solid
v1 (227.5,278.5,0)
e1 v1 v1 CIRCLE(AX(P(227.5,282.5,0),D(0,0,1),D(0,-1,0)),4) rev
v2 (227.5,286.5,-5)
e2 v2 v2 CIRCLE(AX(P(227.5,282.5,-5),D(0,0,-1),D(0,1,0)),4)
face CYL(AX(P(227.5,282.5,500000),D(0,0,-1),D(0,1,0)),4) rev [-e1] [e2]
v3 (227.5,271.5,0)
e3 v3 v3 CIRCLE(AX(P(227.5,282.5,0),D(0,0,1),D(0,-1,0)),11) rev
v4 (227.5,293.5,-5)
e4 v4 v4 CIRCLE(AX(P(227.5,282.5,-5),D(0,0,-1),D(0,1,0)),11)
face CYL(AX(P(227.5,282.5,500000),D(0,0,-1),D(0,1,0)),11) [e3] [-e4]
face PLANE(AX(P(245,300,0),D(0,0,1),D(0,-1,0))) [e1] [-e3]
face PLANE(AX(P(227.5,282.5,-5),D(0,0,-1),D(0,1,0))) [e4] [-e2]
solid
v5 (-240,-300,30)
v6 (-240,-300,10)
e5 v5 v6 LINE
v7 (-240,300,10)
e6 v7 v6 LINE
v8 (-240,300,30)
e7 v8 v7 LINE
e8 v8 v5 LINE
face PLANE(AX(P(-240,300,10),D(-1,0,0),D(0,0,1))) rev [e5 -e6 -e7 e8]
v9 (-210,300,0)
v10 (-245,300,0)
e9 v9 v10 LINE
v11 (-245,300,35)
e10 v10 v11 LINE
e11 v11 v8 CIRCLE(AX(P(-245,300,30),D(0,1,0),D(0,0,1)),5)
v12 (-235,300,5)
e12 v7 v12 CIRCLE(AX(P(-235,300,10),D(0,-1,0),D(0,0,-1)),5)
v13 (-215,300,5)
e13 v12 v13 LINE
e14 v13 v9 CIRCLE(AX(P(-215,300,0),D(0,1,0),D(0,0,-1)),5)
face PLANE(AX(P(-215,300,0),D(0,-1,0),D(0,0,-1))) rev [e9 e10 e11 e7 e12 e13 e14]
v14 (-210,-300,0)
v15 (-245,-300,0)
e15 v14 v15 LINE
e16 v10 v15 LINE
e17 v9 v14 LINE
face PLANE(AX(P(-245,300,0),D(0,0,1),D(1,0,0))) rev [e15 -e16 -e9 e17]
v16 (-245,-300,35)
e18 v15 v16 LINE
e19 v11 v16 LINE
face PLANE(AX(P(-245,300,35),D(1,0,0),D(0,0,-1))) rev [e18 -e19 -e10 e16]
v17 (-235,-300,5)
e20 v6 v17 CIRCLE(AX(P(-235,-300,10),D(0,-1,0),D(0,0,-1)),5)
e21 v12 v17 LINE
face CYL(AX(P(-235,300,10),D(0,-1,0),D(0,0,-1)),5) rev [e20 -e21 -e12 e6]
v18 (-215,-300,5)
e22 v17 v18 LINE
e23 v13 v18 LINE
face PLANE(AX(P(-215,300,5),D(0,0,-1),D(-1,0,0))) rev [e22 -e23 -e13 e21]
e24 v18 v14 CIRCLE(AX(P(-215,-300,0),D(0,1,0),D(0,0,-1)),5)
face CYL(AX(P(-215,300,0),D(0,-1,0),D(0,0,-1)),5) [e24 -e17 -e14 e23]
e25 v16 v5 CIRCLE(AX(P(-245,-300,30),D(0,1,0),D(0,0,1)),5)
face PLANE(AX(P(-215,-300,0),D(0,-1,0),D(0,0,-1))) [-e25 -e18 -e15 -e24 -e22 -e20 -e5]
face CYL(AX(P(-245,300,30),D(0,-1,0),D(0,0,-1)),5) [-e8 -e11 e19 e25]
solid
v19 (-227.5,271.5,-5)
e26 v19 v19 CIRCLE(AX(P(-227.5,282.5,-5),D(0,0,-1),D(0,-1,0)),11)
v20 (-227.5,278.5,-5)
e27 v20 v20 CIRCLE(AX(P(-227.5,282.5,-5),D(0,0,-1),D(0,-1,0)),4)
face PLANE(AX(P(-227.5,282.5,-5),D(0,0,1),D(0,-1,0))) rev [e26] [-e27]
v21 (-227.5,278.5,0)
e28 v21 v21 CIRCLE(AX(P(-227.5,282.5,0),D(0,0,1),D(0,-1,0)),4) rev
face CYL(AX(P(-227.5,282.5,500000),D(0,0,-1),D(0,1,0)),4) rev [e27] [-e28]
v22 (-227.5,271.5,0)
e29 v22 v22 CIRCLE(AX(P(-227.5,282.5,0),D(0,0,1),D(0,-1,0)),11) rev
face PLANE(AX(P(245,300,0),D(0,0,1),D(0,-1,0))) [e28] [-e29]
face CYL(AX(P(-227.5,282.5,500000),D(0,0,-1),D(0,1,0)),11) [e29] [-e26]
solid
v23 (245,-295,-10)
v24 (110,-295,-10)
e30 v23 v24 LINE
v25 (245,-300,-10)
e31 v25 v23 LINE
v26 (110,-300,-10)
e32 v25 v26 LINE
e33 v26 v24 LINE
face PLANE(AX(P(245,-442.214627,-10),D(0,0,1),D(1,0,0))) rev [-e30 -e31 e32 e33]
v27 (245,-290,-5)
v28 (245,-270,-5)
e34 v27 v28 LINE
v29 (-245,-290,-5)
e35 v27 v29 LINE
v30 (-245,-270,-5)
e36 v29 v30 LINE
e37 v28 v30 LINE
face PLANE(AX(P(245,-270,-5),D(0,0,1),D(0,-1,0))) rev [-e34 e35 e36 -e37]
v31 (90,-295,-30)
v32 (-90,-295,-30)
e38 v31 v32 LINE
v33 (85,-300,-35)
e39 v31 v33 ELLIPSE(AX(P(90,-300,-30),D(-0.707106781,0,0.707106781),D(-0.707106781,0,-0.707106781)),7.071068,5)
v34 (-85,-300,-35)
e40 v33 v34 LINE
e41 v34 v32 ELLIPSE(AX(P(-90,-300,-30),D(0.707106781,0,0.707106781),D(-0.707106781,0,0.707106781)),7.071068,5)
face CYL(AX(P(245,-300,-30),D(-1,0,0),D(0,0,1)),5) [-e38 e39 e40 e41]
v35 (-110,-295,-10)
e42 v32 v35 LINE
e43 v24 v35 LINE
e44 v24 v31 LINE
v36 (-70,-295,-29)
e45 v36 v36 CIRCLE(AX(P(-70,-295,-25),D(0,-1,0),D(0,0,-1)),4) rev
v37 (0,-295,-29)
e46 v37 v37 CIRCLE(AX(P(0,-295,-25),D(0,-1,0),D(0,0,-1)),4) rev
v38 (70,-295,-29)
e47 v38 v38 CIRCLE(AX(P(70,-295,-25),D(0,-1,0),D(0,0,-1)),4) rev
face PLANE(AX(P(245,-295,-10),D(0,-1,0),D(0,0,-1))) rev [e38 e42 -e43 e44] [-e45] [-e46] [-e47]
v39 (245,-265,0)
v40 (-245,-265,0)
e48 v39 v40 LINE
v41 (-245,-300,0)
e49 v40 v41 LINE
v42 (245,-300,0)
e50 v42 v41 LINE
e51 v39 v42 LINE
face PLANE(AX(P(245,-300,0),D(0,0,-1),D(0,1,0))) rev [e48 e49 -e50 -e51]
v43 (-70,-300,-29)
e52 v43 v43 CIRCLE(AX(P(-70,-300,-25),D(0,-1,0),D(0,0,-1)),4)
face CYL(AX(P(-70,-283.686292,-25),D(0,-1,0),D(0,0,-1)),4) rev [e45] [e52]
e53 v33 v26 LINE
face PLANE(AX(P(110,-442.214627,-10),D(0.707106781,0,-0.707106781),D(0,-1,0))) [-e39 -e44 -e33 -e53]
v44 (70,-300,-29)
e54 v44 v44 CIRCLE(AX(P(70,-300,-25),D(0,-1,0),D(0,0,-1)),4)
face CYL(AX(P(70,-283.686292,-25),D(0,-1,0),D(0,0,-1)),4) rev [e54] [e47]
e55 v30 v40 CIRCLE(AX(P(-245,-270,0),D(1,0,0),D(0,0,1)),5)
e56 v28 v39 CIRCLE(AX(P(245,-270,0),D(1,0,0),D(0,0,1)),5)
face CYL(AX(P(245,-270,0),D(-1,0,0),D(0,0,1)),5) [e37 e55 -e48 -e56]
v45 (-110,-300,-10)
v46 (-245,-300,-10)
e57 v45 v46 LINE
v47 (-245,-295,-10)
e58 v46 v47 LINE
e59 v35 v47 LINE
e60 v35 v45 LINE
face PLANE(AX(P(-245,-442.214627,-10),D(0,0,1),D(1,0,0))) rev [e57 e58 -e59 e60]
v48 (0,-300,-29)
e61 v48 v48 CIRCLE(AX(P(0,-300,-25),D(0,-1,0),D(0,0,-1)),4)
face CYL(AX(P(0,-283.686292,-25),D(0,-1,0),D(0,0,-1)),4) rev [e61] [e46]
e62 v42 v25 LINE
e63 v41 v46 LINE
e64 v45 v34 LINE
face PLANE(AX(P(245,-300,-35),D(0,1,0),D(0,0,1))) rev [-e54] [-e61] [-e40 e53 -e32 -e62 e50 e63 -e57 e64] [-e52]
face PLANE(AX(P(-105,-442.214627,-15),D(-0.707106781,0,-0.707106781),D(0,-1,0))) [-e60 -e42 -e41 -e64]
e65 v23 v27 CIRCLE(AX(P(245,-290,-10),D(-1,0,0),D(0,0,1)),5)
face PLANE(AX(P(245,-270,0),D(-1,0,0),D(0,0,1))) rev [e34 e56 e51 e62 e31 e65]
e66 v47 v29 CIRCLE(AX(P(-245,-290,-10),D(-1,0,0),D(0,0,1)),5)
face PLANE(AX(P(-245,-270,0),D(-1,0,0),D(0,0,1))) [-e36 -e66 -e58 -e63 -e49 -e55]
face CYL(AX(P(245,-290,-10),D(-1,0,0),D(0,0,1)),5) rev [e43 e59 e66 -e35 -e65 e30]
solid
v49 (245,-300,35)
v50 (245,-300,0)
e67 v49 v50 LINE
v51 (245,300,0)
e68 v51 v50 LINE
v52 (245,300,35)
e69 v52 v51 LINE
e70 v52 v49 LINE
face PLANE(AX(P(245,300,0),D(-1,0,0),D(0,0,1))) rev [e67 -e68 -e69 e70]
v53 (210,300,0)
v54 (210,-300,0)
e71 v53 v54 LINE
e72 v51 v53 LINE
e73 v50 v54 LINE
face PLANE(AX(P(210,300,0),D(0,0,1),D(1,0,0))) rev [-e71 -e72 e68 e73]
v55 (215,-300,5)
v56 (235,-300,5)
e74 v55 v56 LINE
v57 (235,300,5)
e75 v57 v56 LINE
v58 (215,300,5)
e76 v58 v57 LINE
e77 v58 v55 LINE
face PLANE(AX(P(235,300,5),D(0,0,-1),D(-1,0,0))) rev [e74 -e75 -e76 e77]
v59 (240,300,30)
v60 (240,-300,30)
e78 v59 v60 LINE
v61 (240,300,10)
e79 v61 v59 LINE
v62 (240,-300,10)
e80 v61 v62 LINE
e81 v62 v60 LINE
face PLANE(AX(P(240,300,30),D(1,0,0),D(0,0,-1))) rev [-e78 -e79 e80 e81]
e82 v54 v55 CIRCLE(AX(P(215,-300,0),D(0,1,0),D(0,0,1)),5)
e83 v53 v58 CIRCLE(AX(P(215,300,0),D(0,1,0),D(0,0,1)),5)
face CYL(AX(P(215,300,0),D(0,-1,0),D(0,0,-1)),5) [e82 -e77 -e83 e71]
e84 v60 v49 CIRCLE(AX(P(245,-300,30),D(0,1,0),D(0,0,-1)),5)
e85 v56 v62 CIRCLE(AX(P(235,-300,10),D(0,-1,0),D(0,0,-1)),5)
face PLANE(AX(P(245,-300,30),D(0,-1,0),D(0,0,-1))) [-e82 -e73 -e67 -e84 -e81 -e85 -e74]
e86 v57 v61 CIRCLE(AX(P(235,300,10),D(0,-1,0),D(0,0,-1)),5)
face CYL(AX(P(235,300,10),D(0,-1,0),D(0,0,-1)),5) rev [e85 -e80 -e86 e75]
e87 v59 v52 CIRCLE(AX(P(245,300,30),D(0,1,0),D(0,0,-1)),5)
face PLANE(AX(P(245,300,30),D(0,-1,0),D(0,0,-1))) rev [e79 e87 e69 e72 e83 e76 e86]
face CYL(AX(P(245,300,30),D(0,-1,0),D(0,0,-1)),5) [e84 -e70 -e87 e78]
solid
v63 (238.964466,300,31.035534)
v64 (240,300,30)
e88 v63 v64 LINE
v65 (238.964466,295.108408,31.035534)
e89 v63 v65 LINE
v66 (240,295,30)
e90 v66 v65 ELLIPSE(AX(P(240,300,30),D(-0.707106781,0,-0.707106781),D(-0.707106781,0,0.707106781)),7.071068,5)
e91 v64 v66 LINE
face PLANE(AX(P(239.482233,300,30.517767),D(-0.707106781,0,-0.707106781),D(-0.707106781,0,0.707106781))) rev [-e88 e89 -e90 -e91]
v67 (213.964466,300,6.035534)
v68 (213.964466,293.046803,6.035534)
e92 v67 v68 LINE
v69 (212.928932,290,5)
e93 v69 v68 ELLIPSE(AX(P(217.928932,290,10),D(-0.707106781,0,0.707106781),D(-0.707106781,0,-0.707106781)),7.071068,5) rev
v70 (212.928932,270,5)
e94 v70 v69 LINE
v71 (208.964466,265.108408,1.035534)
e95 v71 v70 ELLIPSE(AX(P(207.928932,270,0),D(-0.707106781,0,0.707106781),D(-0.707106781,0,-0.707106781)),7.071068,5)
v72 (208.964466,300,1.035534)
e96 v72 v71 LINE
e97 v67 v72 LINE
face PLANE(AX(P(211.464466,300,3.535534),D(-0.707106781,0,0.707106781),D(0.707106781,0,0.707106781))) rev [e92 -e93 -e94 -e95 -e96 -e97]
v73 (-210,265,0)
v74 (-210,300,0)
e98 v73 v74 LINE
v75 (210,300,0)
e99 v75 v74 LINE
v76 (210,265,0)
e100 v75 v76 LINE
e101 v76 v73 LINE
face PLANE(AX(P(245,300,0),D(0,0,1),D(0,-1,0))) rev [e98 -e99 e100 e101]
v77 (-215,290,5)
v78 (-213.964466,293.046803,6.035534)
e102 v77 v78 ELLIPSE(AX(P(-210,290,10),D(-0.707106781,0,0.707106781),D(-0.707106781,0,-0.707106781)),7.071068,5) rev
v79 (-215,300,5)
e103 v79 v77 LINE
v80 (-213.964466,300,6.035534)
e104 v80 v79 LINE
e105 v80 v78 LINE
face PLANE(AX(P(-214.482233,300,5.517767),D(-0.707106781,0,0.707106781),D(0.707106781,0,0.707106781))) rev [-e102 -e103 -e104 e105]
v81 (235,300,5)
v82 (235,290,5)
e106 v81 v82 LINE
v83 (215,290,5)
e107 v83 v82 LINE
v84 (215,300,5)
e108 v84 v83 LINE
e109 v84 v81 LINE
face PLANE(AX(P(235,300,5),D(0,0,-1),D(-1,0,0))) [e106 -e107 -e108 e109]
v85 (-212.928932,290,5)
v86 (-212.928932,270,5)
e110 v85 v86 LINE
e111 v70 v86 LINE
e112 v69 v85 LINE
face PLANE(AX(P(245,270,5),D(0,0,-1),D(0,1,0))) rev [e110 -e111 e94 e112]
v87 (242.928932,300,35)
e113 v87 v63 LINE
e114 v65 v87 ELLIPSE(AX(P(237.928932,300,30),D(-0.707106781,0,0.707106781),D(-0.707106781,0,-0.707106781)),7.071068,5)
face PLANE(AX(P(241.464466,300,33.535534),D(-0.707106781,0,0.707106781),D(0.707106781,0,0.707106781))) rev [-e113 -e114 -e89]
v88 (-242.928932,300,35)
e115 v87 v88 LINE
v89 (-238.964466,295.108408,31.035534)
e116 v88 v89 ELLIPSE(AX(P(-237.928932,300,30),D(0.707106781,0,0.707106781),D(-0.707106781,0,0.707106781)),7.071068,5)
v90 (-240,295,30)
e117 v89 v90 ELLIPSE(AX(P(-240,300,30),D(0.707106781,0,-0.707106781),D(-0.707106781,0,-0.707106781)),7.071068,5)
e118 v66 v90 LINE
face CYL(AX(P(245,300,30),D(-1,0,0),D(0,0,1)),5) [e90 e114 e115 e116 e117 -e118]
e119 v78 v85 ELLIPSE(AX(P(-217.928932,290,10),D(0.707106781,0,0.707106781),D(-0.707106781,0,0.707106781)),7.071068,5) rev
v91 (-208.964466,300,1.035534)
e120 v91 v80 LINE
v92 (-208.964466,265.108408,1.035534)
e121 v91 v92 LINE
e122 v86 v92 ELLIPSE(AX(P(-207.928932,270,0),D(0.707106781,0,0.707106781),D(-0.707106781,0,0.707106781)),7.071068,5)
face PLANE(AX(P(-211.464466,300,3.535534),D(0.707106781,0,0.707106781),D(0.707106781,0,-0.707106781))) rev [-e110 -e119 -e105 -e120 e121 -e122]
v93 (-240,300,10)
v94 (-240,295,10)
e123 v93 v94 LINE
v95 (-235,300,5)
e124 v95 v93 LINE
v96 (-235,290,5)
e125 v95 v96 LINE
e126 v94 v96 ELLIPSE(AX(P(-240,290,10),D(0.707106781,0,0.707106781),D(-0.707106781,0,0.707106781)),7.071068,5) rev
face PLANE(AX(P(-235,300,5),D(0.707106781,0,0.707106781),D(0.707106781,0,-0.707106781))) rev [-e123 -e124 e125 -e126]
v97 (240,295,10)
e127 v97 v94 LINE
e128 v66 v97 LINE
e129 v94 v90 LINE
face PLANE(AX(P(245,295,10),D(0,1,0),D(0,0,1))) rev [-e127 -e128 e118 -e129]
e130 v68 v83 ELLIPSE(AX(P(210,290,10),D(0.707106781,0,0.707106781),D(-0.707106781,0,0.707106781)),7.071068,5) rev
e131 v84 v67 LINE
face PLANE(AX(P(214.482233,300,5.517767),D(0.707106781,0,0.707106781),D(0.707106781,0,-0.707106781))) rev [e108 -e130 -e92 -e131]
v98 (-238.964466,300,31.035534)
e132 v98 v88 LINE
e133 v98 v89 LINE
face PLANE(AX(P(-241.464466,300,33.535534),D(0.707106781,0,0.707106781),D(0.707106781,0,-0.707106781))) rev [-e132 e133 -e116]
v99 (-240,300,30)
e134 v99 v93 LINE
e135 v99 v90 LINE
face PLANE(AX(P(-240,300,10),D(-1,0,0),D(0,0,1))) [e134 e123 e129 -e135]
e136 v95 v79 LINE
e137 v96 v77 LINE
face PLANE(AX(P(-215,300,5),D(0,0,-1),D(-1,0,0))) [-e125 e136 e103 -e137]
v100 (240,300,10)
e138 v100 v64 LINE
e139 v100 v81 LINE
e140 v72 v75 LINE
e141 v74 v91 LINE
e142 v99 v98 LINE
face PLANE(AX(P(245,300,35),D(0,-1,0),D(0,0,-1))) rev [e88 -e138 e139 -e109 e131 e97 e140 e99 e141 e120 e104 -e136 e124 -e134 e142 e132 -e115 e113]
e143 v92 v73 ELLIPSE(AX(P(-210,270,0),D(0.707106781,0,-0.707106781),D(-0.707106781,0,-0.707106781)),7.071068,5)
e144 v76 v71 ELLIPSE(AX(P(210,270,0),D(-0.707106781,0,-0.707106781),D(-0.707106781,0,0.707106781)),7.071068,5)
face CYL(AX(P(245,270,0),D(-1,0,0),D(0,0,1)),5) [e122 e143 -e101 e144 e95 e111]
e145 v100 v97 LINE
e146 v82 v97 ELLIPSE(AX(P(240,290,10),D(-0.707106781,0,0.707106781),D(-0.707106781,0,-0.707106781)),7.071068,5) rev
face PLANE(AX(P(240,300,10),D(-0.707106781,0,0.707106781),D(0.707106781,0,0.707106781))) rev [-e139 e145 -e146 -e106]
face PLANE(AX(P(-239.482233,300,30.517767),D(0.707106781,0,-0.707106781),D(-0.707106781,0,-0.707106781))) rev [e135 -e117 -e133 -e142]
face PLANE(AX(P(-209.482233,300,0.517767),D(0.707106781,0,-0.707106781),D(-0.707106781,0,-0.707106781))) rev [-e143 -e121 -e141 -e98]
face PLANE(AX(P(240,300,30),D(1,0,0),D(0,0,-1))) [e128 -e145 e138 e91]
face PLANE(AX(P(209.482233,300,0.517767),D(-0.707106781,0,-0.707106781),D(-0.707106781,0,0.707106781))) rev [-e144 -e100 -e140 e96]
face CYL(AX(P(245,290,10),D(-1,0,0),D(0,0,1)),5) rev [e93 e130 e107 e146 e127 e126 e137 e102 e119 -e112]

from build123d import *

# Parameters (mm, degrees)
HIERRO_ANGULAR_35_X_35_X_5_1_DEPTH = 600
HIERRO_ANGULAR_35_X_35_X_5_2_DEPTH = 600
HIERRO_ANGULAR_35_X_35_X_5_3_DEPTH = 490
HIERRO_ANGULAR_35_X_35_X_5_5_DEPTH = 490
SALIENTE_EXTRUIR1_REACH            = 391.391
CROQUIS8_R                         = 11
CROQUIS8_R_2                       = 4
RECORTAR_EXTENDER1_START           = 265
RECORTAR_EXTENDER1_DEPTH           = 35
CROQUIS12_W                        = 140
CROQUIS12_H                        = 25
CORTAR_EXTRUIR1_DEPTH              = 10
CHAFL_N1_SIZE                      = 5
CROQUIS13_R                        = 4
CORTAR_EXTRUIR2_DEPTH              = 5
CORTAR_EXTRUIR3_DEPTH              = 5


# Read off the part's stored shape, not the designer's step: Recortar/Extender1
with BuildPart() as part:
    # Sketch1 → Hierro angular 35 X 35 X 5(1) (new body)
    with BuildSketch(Plane(origin=(-245, -300, 0), x_dir=(0, 0, 1), z_dir=(0, 1, 0))):
        with BuildLine():
            Line((0, 0), (0, 35))
            ThreePointArc((0, 35), (3.535533906, 33.535533906), (5, 30))
            Line((5, 30), (5, 10))
            ThreePointArc((5, 10), (6.464466094, 6.464466094), (10, 5))
            Line((10, 5), (30, 5))
            ThreePointArc((30, 5), (33.535533906, 3.535533906), (35, 0))
            Line((35, 0), (0, 0))
        make_face()
    extrude(amount=HIERRO_ANGULAR_35_X_35_X_5_1_DEPTH)


with BuildPart() as body_2:
    # Sketch11 → Hierro angular 35 X 35 X 5(2) (new body)
    with BuildSketch(Plane(origin=(245, -300, 0), x_dir=(-1, 0, 0), z_dir=(0, 1, 0))):
        with BuildLine():
            Line((0, 0), (0, 35))
            ThreePointArc((0, 35), (3.535533906, 33.535533906), (5, 30))
            Line((5, 30), (5, 10))
            ThreePointArc((5, 10), (6.464466094, 6.464466094), (10, 5))
            Line((10, 5), (30, 5))
            ThreePointArc((30, 5), (33.535533906, 3.535533906), (35, 0))
            Line((35, 0), (0, 0))
        make_face()
    extrude(amount=HIERRO_ANGULAR_35_X_35_X_5_2_DEPTH)


with BuildPart() as body_3:
    # Sketch12 → Hierro angular 35 X 35 X 5(3) (new body)
    with BuildSketch(Plane(origin=(-245, 300, 0), x_dir=(0, 0, 1), z_dir=(1, 0, 0))):
        with BuildLine():
            Line((0, 0), (0, 35))
            ThreePointArc((0, 35), (3.535533906, 33.535533906), (5, 30))
            Line((5, 30), (5, 10))
            ThreePointArc((5, 10), (6.464466094, 6.464466094), (10, 5))
            Line((10, 5), (30, 5))
            ThreePointArc((30, 5), (33.535533906, 3.535533906), (35, 0))
            Line((35, 0), (0, 0))
        make_face()
    extrude(amount=HIERRO_ANGULAR_35_X_35_X_5_3_DEPTH)


with BuildPart() as body_4:
    # Sketch14 → Hierro angular 35 X 35 X 5(5) (new body)
    with BuildSketch(Plane(origin=(-245, -300, 0), x_dir=(0, 0, -1), z_dir=(1, 0, 0))):
        with BuildLine():
            Line((0, 0), (0, 35))
            ThreePointArc((0, 35), (3.535533906, 33.535533906), (5, 30))
            Line((5, 30), (5, 10))
            ThreePointArc((5, 10), (6.464466094, 6.464466094), (10, 5))
            Line((10, 5), (30, 5))
            ThreePointArc((30, 5), (33.535533906, 3.535533906), (35, 0))
            Line((35, 0), (0, 0))
        make_face()
    extrude(amount=HIERRO_ANGULAR_35_X_35_X_5_5_DEPTH)

    # Croquis12 → Cortar-Extruir1 (cut)
    with BuildSketch(Plane(origin=(0, -290, 0), x_dir=(-1, 0, 0), z_dir=(0, 1, 0))):
        with Locations((-175, -22.5)):
            Rectangle(CROQUIS12_W, CROQUIS12_H)
        with Locations((175, -22.5)):
            Rectangle(CROQUIS12_W, CROQUIS12_H)
    extrude(amount=-CORTAR_EXTRUIR1_DEPTH, mode=Mode.SUBTRACT)

    # Chaflán1
    chafl_n1_edges = [body_4.edges().sort_by_distance(p)[0] for p in [
        (105, -297.5, -10),
        (-105, -297.5, -10),
    ]]
    chamfer(chafl_n1_edges, length=CHAFL_N1_SIZE)

    # Croquis13 → Cortar-Extruir2 (cut)
    with BuildSketch(Plane.XZ.offset(300)):
        with Locations(Location((0, -25, 0), (0, 0, 270))):
            Circle(CROQUIS13_R)
        with Locations(Location((70, -25, 0), (0, 0, 270))):
            Circle(CROQUIS13_R)
        with Locations(Location((-70, -25, 0), (0, 0, 270))):
            Circle(CROQUIS13_R)
    extrude(amount=-CORTAR_EXTRUIR2_DEPTH, mode=Mode.SUBTRACT)

    # Croquis14 → Cortar-Extruir3 (cut)
    with BuildSketch(Plane.XZ.offset(300)):
        Polygon((-105, -15), (-85, -35), (-105, -35), align=None)
        Polygon((105, -15), (85, -35), (105, -35), align=None)
    extrude(amount=-CORTAR_EXTRUIR3_DEPTH, mode=Mode.SUBTRACT)


with BuildPart() as body_5:

    # Croquis8 → Saliente-Extruir1 (new, up to next)
    with BuildSketch(Plane(origin=(0, 0, -5), x_dir=(-1, 0, 0), z_dir=(0, 0, -1)), mode=Mode.PRIVATE) as saliente_extruir1_sk1:
        with Locations(Location((-227.5, 282.5, 0), (0, 0, 90))):
            Circle(CROQUIS8_R)
        with Locations(Location((-227.5, 282.5, 0), (0, 0, 90))):
            Circle(CROQUIS8_R_2, mode=Mode.SUBTRACT)
    saliente_extruir1_tool1 = extrude(saliente_extruir1_sk1.sketch, amount=-SALIENTE_EXTRUIR1_REACH, mode=Mode.PRIVATE) - body_3.part
    # Croquis8 → Saliente-Extruir1 (new, up to next)
    with BuildSketch(Plane(origin=(0, 0, -5), x_dir=(-1, 0, 0), z_dir=(0, 0, -1)), mode=Mode.PRIVATE) as saliente_extruir1_sk2:
        with Locations(Location((227.5, 282.5, 0), (0, 0, 270))):
            Circle(CROQUIS8_R)
        with Locations(Location((227.5, 282.5, 0), (0, 0, 270))):
            Circle(CROQUIS8_R_2, mode=Mode.SUBTRACT)
    saliente_extruir1_tool2 = extrude(saliente_extruir1_sk2.sketch, amount=-SALIENTE_EXTRUIR1_REACH, mode=Mode.PRIVATE) - body_3.part
    add(saliente_extruir1_tool1.solids().sort_by_distance((227.5, 271.811127, -5))[0])
    add(saliente_extruir1_tool2.solids().sort_by_distance((-227.5, 293.188873, -5))[0])


with BuildPart() as body_3_1:
    add(body_3.part)

    # Recortar/Extender1 outline → Recortar/Extender1 (cut)
    with BuildSketch(Plane(origin=(0, 0, 0), x_dir=(1, 0, 0), z_dir=(0, 1, 0)).offset(RECORTAR_EXTENDER1_START)):
        Polygon((-243.928932188, -36), (-238.964466094, -31.035533906), (-240, -30), (-240, -10), (-235, -5), (-215, -5), (-213.964466094, -6.035533906), (-208.964466094, -1.035533906), (-212, 2), (-245, 2), (-245, -36), align=None)
        Polygon((238.964466094, -31.035533906), (243.928932188, -36), (245, -36), (245, 2), (212, 2), (208.964466094, -1.035533906), (213.964466094, -6.035533906), (215, -5), (235, -5), (240, -10), (240, -30), align=None)
    extrude(amount=RECORTAR_EXTENDER1_DEPTH, mode=Mode.SUBTRACT)


solid = Compound([part.part, body_2.part, body_4.part, body_5.part, body_3_1.part])
